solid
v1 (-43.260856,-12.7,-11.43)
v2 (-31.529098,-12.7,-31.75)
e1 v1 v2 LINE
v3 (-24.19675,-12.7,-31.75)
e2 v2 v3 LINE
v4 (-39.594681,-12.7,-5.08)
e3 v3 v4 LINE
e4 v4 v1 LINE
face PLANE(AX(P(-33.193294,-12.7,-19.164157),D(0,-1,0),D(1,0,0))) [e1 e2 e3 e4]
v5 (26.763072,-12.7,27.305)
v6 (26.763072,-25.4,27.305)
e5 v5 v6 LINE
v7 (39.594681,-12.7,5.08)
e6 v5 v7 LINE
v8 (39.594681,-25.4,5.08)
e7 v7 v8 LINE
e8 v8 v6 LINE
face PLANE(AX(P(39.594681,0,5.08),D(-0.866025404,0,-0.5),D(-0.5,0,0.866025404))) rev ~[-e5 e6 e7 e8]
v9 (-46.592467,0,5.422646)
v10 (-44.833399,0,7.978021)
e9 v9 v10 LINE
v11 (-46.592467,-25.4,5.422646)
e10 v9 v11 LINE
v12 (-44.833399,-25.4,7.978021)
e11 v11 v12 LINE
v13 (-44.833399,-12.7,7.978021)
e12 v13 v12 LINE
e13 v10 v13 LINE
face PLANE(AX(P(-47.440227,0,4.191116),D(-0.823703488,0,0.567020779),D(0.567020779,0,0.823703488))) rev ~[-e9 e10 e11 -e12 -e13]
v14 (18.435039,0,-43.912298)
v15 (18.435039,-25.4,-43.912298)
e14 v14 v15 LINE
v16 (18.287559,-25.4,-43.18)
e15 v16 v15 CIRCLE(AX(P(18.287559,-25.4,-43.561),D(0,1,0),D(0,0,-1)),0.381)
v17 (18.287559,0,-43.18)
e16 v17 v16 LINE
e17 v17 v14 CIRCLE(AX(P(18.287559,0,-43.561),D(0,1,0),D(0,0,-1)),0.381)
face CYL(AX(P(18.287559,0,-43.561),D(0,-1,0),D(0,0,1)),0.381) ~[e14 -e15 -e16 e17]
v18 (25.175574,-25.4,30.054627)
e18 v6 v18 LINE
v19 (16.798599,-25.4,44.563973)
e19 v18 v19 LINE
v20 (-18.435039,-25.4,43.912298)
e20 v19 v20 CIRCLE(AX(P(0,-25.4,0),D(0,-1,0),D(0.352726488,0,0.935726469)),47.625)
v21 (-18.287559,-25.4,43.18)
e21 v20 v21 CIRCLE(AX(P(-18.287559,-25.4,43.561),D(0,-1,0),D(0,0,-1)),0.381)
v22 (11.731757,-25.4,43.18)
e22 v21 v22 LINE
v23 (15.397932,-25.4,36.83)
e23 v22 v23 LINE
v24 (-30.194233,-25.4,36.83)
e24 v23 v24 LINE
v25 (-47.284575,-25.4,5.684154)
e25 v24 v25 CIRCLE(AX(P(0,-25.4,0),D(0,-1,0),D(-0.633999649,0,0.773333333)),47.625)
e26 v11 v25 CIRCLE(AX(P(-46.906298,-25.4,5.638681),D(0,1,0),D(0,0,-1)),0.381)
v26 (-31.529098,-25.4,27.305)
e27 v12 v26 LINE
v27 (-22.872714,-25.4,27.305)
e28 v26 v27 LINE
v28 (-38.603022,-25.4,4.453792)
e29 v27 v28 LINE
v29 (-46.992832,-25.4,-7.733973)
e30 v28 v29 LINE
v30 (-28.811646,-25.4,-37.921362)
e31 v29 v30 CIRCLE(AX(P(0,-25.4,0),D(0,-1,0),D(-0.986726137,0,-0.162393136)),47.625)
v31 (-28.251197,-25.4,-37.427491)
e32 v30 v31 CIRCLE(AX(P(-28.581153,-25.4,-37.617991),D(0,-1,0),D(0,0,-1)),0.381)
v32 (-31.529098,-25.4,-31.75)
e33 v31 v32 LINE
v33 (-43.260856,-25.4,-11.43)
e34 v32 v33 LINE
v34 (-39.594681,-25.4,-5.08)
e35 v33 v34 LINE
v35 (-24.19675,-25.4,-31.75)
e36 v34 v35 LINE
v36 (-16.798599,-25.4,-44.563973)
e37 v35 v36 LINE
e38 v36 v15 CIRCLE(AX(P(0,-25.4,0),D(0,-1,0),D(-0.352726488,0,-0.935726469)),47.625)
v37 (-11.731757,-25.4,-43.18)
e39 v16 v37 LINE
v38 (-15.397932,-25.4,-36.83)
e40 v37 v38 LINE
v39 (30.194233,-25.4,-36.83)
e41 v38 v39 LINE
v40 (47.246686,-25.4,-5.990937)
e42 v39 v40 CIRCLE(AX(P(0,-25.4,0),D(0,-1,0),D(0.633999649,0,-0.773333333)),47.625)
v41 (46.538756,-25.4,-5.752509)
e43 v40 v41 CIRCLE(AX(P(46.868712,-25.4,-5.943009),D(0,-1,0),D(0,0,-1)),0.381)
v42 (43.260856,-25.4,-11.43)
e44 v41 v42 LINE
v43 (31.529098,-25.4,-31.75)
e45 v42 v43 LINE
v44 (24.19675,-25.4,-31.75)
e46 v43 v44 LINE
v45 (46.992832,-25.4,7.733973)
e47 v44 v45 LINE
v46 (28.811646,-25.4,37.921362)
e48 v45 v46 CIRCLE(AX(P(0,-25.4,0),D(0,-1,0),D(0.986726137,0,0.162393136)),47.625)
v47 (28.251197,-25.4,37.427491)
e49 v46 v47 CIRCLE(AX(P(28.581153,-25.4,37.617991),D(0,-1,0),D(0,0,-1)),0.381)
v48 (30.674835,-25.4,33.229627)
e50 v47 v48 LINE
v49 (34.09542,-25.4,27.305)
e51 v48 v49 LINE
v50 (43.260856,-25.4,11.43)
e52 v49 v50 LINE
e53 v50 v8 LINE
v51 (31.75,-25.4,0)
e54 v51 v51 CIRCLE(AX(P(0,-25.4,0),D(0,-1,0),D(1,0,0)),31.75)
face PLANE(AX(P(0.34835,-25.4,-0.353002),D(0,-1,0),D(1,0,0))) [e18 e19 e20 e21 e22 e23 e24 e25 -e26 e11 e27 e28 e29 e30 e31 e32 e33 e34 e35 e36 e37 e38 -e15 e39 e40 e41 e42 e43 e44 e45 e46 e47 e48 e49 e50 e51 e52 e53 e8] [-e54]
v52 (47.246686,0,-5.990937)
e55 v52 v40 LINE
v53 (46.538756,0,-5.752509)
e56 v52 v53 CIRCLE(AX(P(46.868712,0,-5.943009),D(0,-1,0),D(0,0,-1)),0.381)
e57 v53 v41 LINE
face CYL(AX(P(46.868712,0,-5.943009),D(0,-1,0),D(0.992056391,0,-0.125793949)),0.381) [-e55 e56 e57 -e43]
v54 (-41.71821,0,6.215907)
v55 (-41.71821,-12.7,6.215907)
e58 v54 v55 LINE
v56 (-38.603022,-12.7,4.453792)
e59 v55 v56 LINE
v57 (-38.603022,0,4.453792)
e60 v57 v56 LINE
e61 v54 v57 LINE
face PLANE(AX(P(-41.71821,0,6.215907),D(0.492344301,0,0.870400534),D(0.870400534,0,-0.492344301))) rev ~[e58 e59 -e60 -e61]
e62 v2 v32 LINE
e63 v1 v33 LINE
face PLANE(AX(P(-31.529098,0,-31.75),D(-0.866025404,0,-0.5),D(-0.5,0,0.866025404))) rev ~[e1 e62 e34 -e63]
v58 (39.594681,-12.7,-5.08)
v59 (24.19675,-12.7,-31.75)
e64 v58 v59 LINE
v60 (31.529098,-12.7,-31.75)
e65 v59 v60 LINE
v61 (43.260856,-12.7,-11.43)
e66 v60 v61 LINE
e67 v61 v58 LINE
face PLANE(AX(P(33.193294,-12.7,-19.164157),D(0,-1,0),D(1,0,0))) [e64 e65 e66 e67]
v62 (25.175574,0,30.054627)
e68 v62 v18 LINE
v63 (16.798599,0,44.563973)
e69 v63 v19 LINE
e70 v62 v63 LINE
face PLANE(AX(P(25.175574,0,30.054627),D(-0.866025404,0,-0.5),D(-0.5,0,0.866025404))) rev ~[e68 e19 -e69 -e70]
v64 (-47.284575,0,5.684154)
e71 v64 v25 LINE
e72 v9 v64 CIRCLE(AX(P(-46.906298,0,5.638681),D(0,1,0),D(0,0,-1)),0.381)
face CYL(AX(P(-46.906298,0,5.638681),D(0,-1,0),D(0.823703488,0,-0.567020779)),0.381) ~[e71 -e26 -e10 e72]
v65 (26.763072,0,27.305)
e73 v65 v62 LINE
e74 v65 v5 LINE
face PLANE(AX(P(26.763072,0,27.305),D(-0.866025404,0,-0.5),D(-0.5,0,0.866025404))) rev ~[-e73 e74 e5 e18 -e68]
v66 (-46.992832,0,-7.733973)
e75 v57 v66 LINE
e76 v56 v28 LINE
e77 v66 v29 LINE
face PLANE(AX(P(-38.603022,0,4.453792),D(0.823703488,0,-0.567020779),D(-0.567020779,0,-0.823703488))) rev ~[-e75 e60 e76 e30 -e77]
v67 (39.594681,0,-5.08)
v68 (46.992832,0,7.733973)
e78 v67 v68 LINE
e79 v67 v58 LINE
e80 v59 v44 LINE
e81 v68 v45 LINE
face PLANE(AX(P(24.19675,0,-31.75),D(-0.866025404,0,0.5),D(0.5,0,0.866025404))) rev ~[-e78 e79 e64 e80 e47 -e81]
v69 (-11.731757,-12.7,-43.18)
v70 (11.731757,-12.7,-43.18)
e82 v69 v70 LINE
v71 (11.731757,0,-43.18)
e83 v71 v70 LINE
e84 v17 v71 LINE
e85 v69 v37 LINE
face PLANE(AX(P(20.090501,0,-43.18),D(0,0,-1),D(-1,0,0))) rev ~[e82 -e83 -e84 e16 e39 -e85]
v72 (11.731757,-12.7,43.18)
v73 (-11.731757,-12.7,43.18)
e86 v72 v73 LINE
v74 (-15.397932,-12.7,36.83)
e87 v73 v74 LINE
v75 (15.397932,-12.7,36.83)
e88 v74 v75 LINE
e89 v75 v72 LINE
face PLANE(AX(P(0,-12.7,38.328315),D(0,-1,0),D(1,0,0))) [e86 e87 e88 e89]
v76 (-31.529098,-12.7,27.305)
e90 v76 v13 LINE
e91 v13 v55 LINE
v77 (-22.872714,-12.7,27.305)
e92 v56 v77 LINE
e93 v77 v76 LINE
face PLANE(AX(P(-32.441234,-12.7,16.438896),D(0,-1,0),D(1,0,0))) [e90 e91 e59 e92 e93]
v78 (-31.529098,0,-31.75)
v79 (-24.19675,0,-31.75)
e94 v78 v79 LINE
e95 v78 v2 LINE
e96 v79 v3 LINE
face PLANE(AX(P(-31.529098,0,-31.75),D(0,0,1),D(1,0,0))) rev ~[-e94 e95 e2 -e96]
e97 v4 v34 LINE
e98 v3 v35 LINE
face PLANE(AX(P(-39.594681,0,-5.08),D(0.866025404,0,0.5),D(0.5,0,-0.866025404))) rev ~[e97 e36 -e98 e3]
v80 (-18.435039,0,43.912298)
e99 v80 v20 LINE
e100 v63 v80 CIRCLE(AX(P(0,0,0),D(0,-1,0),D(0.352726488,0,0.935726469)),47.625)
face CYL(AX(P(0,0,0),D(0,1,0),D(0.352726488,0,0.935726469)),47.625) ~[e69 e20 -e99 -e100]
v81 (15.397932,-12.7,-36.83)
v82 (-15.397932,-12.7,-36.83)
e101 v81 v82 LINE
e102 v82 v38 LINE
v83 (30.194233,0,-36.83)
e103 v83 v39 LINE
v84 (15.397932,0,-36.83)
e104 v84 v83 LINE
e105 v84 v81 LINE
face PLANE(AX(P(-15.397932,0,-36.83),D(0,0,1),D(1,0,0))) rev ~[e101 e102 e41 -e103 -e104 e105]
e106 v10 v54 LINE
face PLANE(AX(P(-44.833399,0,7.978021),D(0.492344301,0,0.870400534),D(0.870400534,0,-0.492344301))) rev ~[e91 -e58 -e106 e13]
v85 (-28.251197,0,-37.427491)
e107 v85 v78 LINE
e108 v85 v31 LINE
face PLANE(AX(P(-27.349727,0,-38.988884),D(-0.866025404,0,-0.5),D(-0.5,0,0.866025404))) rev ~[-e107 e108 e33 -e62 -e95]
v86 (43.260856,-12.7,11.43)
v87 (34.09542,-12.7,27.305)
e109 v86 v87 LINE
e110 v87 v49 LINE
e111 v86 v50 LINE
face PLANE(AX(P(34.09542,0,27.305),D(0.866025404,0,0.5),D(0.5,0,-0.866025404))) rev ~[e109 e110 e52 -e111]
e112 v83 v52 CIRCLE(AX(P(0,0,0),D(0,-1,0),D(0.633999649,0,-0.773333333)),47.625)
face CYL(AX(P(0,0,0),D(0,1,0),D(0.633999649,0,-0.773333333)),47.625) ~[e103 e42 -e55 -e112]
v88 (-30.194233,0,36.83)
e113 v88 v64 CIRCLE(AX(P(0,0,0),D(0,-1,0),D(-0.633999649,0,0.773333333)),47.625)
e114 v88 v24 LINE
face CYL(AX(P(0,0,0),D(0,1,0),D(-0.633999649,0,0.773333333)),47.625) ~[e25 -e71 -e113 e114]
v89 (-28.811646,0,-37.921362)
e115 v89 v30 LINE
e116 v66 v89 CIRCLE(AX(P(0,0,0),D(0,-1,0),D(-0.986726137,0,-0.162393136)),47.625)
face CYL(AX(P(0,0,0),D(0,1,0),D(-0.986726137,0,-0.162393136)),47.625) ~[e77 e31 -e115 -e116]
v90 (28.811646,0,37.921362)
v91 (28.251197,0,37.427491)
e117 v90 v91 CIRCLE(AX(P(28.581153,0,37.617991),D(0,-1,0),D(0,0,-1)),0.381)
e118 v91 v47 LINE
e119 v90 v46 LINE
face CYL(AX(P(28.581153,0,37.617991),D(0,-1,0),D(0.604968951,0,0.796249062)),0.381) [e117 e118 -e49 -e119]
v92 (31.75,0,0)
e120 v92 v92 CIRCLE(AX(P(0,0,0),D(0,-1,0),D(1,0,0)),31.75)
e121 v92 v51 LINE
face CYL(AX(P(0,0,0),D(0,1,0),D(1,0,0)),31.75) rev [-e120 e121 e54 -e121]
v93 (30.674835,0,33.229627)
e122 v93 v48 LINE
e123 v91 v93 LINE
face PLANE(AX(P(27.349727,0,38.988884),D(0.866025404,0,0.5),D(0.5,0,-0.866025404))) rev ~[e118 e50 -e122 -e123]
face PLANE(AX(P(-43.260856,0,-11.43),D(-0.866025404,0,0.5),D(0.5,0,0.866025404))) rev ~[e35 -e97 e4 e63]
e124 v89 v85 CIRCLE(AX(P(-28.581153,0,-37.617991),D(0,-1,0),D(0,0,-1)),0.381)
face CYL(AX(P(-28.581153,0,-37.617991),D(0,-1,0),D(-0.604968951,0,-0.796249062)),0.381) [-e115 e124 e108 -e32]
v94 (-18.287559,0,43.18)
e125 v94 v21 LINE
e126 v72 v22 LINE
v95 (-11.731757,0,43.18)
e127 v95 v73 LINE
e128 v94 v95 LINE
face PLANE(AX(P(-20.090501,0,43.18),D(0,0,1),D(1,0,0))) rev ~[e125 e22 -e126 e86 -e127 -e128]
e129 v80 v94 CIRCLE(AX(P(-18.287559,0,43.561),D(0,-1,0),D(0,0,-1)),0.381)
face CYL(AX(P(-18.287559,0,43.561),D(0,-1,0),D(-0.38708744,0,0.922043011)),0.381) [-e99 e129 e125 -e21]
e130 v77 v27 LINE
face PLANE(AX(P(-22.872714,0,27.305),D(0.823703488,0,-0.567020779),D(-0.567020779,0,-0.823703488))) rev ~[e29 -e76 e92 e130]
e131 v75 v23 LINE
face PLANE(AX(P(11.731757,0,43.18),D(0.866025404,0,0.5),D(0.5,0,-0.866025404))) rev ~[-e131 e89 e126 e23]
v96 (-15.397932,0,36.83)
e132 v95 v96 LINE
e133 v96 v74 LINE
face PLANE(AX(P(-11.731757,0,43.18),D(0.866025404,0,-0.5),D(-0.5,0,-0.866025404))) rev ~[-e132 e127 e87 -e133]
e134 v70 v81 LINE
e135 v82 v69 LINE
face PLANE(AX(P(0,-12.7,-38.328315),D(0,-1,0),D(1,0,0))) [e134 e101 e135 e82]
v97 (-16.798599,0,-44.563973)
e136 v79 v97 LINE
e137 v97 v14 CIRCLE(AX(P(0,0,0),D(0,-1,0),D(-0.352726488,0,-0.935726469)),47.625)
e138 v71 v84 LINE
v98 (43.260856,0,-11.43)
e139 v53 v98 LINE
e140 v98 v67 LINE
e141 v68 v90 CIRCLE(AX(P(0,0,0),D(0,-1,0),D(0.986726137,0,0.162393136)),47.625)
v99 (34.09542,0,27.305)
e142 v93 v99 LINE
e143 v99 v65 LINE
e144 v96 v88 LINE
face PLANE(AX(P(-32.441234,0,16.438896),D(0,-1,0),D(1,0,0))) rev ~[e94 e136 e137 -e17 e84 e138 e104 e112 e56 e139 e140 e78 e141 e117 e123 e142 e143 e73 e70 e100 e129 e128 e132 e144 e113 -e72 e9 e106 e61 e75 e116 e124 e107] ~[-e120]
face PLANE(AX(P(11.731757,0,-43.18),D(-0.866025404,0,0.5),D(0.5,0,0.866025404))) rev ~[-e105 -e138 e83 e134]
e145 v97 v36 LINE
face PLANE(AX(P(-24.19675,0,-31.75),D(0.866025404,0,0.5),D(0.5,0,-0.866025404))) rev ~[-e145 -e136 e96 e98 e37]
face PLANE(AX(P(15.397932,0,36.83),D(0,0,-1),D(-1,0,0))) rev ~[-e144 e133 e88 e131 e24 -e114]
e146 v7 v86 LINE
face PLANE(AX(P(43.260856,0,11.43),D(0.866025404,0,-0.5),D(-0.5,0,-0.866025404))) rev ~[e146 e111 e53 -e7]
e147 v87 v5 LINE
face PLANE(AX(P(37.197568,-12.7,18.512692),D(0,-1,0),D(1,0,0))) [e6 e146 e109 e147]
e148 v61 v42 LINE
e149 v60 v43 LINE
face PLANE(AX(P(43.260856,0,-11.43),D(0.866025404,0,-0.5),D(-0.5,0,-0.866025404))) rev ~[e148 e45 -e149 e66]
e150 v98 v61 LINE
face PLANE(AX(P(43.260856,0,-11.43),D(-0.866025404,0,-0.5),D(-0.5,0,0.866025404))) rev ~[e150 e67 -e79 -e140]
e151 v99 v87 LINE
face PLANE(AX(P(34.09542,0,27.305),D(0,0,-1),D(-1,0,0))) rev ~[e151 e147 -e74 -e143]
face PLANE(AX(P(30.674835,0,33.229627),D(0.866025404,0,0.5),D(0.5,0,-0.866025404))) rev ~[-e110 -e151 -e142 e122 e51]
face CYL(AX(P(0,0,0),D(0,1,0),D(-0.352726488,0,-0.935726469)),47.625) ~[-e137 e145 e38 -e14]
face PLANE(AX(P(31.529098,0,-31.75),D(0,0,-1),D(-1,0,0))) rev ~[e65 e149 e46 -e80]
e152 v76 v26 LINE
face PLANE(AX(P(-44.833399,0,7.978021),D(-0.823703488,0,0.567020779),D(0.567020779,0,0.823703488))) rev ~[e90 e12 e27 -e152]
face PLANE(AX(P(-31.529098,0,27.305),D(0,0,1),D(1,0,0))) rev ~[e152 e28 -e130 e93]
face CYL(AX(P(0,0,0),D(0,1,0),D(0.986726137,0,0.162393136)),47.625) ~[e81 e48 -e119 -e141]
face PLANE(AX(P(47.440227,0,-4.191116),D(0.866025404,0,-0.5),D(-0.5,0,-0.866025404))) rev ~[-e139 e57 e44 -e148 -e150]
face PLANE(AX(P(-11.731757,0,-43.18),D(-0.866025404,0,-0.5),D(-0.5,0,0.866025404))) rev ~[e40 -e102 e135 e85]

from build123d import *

# Parameters (mm, degrees)
F0_R     = 31.75
F1_DEPTH = 25.4
F2_DEPTH = 12.7
F3_R     = 0.381


# Not quite as in the source:
# - a feature names something its author has since deleted; it is built from what else it names


with BuildPart() as f1:
    # F0 (on Front) → F1 (new body)
    with BuildSketch(Plane.XZ):
        with BuildLine():
            Line((15.3979316793, -36.83), (30.194233307, -36.83))
            ThreePointArc((30.194233307, -36.83), (42.108212504, -22.2494733583), (47.4402273678, -4.1911158763))
            Line((47.4402273678, -4.1911158763), (43.2608556704, -11.43))
            Line((43.2608556704, -11.43), (31.5290982004, -31.75))
            Line((31.5290982004, -31.75), (27.8629239911, -31.75))
            Line((27.8629239911, -31.75), (24.1967497817, -31.75))
            Line((24.1967497817, -31.75), (39.594681461, -5.08))
            Line((39.594681461, -5.08), (46.9928322749, 7.7339730917))
            ThreePointArc((46.9928322749, 7.7339730917), (40.3227154011, 25.3420450573), (27.349726503, 38.9888841237))
            Line((27.349726503, 38.9888841237), (30.6748353416, 33.2296266746))
            Line((30.6748353416, 33.2296266746), (34.095420147, 27.305))
            Line((34.095420147, 27.305), (43.2608556704, 11.43))
            Line((43.2608556704, 11.43), (41.4277685657, 8.255))
            Line((41.4277685657, 8.255), (39.594681461, 5.08))
            Line((39.594681461, 5.08), (26.7630717283, 27.305))
            Line((26.7630717283, 27.305), (25.1755740867, 30.0546265722))
            Line((25.1755740867, 30.0546265722), (16.7985989679, 44.5639730917))
            ThreePointArc((16.7985989679, 44.5639730917), (-1.7854971029, 47.5915184155), (-20.0905008648, 43.18))
            Line((-20.0905008648, 43.18), (-11.7317574699, 43.18))
            Line((-11.7317574699, 43.18), (11.7317574699, 43.18))
            Line((11.7317574699, 43.18), (13.5648445746, 40.005))
            Line((13.5648445746, 40.005), (15.3979316793, 36.83))
            Line((15.3979316793, 36.83), (-15.3979316793, 36.83))
            Line((-15.3979316793, 36.83), (-30.194233307, 36.83))
            ThreePointArc((-30.194233307, 36.83), (-42.108212504, 22.2494733583), (-47.4402273678, 4.1911158763))
            Line((-47.4402273678, 4.1911158763), (-44.833398728, 7.9780209084))
            Line((-44.833398728, 7.9780209084), (-31.5290982004, 27.305))
            Line((-31.5290982004, 27.305), (-27.2009059294, 27.305))
            Line((-27.2009059294, 27.305), (-22.8727136583, 27.305))
            Line((-22.8727136583, 27.305), (-38.6030217944, 4.4537921653))
            Line((-38.6030217944, 4.4537921653), (-46.9928322749, -7.7339730917))
            ThreePointArc((-46.9928322749, -7.7339730917), (-40.3227154011, -25.3420450573), (-27.349726503, -38.9888841237))
            Line((-27.349726503, -38.9888841237), (-31.5290982004, -31.75))
            Line((-31.5290982004, -31.75), (-43.2608556704, -11.43))
            Line((-43.2608556704, -11.43), (-41.4277685657, -8.255))
            Line((-41.4277685657, -8.255), (-39.594681461, -5.08))
            Line((-39.594681461, -5.08), (-24.1967497817, -31.75))
            Line((-24.1967497817, -31.75), (-16.7985989679, -44.5639730917))
            ThreePointArc((-16.7985989679, -44.5639730917), (1.7854971029, -47.5915184155), (20.0905008648, -43.18))
            Line((20.0905008648, -43.18), (11.7317574699, -43.18))
            Line((11.7317574699, -43.18), (-11.7317574699, -43.18))
            Line((-11.7317574699, -43.18), (-13.5648445746, -40.005))
            Line((-13.5648445746, -40.005), (-15.3979316793, -36.83))
            Line((-15.3979316793, -36.83), (15.3979316793, -36.83))
        make_face()
        Circle(F0_R, mode=Mode.SUBTRACT)
    extrude(amount=F1_DEPTH)

    # F0 (on Front) → F2 (join)
    with BuildSketch(Plane.XZ):
        Polygon((-41.7182102612, 6.2159065369), (-38.6030217944, 4.4537921653), (-22.8727136583, 27.305), (-27.2009059294, 27.305), align=None)
        Polygon((-44.833398728, 7.9780209084), (-41.7182102612, 6.2159065369), (-27.2009059294, 27.305), (-31.5290982004, 27.305), align=None)
        Polygon((-27.8629239911, -31.75), (-24.1967497817, -31.75), (-39.594681461, -5.08), (-41.4277685657, -8.255), align=None)
        Polygon((-31.5290982004, -31.75), (-27.8629239911, -31.75), (-41.4277685657, -8.255), (-43.2608556704, -11.43), align=None)
        Polygon((13.5648445746, -40.005), (15.3979316793, -36.83), (-15.3979316793, -36.83), (-13.5648445746, -40.005), align=None)
        Polygon((11.7317574699, -43.18), (13.5648445746, -40.005), (-13.5648445746, -40.005), (-11.7317574699, -43.18), align=None)
        Polygon((27.8629239911, -31.75), (41.4277685657, -8.255), (39.594681461, -5.08), (24.1967497817, -31.75), align=None)
        Polygon((31.5290982004, -31.75), (43.2608556704, -11.43), (41.4277685657, -8.255), (27.8629239911, -31.75), align=None)
        Polygon((43.2608556704, 11.43), (34.095420147, 27.305), (30.4292459376, 27.305), (41.4277685657, 8.255), align=None)
        Polygon((41.4277685657, 8.255), (30.4292459376, 27.305), (26.7630717283, 27.305), (39.594681461, 5.08), align=None)
        Polygon((13.5648445746, 40.005), (-13.5648445746, 40.005), (-15.3979316793, 36.83), (15.3979316793, 36.83), align=None)
        Polygon((11.7317574699, 43.18), (-11.7317574699, 43.18), (-13.5648445746, 40.005), (13.5648445746, 40.005), align=None)
    extrude(amount=F2_DEPTH)

    # F3
    f3_edges = [f1.edges().sort_by_distance(p)[0] for p in [
        (-47.440227, -12.7, 4.191116),
        (-27.349727, -12.7, -38.988884),
        (20.090501, -12.7, -43.18),
        (47.440227, -12.7, -4.191116),
        (27.349727, -12.7, 38.988884),
        (-20.090501, -12.7, 43.18),
    ]]
    fillet(f3_edges, radius=F3_R)


solid = f1.part
